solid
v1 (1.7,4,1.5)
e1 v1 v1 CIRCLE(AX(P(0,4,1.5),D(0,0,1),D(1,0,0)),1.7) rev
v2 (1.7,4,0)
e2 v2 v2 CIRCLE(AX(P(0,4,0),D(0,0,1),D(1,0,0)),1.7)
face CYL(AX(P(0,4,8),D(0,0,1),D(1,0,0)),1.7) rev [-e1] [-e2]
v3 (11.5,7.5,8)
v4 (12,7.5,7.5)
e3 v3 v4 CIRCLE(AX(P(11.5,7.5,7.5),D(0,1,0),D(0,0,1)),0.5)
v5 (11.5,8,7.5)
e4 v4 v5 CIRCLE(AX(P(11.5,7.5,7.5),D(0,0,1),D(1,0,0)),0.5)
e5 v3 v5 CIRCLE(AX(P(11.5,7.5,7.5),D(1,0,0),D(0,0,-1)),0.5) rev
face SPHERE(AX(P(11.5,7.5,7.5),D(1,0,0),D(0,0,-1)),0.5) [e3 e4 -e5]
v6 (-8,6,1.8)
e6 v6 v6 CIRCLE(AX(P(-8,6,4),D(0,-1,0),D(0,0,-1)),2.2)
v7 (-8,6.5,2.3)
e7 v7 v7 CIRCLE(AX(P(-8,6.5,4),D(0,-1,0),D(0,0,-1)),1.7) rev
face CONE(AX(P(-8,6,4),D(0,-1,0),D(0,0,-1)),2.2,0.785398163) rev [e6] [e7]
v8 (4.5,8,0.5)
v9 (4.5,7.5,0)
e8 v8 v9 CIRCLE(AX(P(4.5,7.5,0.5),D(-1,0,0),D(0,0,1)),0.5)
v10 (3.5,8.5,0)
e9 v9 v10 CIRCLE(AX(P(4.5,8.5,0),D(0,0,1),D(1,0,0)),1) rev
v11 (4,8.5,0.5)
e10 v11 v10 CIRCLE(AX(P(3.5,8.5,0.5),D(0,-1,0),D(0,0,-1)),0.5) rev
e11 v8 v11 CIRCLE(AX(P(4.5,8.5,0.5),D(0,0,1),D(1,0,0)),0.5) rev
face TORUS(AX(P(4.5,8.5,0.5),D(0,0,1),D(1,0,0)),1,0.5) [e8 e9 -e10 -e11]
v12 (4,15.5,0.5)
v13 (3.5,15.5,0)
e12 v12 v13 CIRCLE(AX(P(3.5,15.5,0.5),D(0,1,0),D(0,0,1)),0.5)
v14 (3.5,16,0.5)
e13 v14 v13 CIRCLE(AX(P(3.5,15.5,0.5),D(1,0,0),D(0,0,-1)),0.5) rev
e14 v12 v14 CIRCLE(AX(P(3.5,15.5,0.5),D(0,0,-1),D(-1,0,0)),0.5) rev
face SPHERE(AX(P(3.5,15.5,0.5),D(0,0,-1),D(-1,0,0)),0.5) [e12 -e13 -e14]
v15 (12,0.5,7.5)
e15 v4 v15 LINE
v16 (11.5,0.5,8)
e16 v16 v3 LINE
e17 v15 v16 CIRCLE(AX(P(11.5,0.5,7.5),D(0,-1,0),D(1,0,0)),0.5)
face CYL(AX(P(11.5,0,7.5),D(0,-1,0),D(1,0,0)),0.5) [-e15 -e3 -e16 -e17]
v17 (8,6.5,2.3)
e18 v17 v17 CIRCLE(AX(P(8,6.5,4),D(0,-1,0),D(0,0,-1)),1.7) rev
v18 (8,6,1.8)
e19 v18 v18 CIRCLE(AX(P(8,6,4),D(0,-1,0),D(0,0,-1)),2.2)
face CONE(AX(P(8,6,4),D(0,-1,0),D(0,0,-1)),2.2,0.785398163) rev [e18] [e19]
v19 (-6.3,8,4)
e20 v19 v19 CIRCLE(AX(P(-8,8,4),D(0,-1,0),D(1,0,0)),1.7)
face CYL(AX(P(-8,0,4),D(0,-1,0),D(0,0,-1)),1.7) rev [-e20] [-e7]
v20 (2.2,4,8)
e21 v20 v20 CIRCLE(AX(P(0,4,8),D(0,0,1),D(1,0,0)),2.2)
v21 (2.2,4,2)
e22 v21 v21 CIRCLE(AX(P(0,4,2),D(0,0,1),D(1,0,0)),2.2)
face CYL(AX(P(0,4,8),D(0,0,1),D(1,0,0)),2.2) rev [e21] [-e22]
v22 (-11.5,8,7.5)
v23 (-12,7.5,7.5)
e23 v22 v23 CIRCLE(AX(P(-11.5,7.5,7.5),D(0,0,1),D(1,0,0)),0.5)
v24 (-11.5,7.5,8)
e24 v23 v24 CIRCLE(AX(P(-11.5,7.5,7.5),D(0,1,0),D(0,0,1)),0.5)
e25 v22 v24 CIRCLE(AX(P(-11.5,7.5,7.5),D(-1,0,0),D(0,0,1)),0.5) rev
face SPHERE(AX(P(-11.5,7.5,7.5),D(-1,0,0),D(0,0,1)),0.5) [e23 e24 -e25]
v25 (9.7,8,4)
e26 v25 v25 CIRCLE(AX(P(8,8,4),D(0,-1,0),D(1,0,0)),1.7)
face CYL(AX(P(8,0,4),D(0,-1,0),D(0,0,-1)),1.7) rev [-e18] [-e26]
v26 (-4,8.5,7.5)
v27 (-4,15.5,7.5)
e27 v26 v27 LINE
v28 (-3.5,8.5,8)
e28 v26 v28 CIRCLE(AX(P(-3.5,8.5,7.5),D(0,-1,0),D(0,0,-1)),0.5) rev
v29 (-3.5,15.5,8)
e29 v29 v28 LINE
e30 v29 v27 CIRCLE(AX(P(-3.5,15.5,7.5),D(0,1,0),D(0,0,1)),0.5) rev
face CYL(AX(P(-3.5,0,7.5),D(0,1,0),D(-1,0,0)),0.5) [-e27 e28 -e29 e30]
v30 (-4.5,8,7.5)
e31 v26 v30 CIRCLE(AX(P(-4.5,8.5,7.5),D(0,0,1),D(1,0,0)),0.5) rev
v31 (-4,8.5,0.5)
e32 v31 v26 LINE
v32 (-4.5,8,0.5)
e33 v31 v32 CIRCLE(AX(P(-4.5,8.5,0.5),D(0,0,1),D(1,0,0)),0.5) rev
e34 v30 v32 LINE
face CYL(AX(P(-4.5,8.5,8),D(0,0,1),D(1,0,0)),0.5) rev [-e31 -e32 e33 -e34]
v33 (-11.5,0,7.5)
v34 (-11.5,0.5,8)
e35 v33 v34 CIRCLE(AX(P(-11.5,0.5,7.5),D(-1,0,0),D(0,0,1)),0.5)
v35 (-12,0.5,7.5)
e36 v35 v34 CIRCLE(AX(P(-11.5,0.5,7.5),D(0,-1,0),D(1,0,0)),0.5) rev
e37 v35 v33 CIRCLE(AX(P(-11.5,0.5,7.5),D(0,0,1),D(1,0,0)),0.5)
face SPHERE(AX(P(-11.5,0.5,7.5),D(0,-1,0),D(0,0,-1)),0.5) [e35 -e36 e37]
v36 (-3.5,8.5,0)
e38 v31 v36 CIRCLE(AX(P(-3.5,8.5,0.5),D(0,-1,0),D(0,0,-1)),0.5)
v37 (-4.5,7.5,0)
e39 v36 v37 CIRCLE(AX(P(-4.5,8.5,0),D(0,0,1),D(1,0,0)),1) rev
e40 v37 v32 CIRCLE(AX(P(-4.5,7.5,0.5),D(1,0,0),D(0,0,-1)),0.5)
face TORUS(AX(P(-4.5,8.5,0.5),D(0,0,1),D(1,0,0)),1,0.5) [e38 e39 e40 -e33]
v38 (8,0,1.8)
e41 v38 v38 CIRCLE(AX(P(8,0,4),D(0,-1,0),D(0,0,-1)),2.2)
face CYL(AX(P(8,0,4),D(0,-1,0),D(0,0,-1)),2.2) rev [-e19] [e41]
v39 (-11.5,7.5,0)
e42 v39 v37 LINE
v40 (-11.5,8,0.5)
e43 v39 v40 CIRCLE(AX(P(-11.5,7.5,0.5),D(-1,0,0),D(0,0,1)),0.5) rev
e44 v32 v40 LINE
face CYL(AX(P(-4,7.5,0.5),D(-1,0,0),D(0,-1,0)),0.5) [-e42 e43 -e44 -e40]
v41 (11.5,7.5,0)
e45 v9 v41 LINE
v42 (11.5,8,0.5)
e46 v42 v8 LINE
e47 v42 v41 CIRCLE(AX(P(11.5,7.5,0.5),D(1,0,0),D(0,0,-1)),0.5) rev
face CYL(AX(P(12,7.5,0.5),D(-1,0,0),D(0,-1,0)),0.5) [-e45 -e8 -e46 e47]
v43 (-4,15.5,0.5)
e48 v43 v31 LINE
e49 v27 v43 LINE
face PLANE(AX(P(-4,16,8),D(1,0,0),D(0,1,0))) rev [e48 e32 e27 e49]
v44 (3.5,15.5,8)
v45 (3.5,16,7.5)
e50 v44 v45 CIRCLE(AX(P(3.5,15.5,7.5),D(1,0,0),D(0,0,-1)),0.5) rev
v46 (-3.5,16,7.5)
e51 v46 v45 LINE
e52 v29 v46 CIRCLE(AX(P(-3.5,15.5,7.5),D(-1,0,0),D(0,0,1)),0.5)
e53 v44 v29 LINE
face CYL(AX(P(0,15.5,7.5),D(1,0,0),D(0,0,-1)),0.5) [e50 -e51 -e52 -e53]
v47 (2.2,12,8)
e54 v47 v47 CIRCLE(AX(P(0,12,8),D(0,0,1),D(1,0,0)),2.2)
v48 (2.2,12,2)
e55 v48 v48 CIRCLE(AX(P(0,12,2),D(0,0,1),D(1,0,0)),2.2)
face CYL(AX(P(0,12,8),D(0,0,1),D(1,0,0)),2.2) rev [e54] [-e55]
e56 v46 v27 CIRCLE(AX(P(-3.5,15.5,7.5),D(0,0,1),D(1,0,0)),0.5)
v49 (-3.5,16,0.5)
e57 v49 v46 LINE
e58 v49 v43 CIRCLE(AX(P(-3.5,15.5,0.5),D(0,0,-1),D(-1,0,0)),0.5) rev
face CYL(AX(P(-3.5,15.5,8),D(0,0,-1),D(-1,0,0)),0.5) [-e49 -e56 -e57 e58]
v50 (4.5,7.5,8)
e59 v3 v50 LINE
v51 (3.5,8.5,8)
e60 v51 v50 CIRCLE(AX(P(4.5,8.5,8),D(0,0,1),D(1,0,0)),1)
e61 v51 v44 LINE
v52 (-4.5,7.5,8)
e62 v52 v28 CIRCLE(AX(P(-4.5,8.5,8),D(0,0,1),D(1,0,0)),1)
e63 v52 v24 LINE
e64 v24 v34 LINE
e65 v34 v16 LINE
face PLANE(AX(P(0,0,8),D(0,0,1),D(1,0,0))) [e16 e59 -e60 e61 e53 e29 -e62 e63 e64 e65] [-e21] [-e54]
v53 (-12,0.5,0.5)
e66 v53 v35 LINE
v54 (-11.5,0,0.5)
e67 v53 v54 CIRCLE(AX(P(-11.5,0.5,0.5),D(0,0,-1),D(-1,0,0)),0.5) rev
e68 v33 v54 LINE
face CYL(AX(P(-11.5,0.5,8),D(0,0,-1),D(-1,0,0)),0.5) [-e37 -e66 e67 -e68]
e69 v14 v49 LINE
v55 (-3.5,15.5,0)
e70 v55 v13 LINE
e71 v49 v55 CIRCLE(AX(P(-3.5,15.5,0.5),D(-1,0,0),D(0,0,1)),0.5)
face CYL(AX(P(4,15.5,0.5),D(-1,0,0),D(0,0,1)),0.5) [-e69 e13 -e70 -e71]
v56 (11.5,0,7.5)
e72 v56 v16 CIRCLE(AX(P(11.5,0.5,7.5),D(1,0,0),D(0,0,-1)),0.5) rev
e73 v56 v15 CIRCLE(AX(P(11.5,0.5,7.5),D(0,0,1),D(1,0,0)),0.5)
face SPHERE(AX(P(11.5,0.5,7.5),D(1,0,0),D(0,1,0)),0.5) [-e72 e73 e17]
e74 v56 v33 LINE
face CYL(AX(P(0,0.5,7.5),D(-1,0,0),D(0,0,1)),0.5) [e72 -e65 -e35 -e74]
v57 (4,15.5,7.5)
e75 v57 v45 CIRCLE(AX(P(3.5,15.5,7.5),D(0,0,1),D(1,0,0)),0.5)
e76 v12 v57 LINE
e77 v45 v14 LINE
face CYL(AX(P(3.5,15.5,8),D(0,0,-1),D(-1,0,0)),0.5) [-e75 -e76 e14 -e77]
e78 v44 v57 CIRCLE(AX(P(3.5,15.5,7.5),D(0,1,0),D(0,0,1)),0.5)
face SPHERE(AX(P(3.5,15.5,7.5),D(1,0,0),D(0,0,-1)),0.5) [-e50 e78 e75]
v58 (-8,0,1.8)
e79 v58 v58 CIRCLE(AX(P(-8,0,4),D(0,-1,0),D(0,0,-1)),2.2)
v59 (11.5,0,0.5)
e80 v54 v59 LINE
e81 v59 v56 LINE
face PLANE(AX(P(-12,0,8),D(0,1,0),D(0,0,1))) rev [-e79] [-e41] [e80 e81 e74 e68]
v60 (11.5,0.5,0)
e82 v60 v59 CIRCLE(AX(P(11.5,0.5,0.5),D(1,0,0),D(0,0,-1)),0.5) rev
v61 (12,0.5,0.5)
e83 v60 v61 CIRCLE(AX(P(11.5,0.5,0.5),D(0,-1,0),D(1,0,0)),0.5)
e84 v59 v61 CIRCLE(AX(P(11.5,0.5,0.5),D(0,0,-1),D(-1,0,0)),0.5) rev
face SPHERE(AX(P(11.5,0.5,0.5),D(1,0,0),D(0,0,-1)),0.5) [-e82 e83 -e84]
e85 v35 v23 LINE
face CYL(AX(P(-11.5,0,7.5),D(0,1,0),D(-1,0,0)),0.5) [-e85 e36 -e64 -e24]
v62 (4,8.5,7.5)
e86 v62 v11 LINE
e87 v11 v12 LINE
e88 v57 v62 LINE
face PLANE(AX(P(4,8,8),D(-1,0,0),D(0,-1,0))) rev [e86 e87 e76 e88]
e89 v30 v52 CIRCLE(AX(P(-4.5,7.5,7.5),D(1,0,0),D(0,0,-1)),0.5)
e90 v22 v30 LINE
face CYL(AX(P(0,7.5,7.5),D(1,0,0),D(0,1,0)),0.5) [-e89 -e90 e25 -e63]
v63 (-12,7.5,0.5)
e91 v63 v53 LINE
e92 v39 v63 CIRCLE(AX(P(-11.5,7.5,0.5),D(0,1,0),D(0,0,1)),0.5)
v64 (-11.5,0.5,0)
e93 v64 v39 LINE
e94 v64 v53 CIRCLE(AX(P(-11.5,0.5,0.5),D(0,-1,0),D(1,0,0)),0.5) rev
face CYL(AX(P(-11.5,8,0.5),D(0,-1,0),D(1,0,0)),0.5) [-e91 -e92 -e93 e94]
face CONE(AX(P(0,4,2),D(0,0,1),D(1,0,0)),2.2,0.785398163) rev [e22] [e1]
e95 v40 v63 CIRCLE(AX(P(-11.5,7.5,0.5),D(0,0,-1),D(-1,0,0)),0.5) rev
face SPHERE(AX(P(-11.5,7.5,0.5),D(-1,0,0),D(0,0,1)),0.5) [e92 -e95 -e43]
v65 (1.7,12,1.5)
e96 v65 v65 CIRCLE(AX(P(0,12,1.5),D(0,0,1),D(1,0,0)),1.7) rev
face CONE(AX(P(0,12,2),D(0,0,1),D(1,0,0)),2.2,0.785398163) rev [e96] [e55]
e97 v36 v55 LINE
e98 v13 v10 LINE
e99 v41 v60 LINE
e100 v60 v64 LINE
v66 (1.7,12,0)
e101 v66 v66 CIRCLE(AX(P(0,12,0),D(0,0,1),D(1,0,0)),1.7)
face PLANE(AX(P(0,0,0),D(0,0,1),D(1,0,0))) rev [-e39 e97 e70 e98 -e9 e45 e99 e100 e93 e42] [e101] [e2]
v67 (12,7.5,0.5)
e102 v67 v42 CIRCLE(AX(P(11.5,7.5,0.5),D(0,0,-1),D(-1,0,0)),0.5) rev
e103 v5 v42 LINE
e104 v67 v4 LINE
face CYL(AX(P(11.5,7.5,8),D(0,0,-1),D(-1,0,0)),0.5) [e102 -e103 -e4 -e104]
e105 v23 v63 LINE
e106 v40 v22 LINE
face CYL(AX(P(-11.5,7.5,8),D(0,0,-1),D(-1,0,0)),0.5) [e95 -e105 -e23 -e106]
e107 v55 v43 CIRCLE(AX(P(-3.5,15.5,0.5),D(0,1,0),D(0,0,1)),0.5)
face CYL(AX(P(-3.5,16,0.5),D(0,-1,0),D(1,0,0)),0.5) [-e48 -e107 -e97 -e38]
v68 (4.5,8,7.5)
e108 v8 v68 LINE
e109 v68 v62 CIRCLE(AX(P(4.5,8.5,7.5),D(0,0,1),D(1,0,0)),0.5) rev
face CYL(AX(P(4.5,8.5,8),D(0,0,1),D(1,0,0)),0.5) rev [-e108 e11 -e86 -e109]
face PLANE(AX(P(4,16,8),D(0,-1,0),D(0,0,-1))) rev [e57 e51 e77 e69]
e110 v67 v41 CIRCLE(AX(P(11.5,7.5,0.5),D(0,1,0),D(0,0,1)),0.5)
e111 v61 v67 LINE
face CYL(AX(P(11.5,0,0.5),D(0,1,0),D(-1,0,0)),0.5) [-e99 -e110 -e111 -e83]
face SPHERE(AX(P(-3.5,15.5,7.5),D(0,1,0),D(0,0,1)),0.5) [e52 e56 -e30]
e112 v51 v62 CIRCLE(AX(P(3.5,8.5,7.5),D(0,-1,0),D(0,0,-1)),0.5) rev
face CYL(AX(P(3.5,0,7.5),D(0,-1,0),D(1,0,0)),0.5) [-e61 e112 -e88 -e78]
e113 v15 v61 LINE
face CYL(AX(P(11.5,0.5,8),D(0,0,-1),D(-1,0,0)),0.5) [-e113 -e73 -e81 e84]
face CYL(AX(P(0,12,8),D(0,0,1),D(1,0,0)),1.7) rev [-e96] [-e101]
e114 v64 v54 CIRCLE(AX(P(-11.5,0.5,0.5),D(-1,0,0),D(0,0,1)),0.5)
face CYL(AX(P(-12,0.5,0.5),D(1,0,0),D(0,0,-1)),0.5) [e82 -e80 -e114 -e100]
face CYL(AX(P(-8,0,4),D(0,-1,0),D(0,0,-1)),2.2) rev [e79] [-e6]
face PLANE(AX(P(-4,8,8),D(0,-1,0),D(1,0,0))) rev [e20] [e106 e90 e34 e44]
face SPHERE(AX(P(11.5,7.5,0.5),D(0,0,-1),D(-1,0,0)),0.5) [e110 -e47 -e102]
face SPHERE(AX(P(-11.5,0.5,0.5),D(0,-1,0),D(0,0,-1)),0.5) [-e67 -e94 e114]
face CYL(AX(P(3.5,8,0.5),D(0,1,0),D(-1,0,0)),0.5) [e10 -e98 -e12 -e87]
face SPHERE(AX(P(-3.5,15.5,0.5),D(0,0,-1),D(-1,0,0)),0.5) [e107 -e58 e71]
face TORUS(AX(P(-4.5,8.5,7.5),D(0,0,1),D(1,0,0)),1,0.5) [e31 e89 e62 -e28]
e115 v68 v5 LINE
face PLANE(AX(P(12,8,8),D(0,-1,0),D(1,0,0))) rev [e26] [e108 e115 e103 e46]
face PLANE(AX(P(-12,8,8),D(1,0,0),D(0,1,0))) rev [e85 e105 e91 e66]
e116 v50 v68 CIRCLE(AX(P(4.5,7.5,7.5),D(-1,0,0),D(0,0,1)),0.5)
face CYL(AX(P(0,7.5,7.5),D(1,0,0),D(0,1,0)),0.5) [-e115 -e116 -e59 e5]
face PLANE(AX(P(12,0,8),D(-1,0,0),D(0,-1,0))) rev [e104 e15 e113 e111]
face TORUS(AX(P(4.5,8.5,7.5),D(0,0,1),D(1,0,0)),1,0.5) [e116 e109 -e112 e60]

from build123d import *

# Parameters (mm, degrees)
BOSS_EXTRUDE1_DEPTH                      = 8
F_4_4_4_4_DIAMETER_HOLE1_D               = 4.4
F_4_4_4_4_DIAMETER_HOLE1_DEPTH           = 6
F_4_4_4_4_DIAMETER_HOLE1_TIP             = 2.2
F_4_4_4_4_DIAMETER_HOLE1_ON_FACE_2_D     = 4.4
F_4_4_4_4_DIAMETER_HOLE1_ON_FACE_2_DEPTH = 6
F_4_4_4_4_DIAMETER_HOLE1_ON_FACE_2_TIP   = 2.2
F_3_4_START                              = 6.4999999
F_3_4_3_4_DIAMETER_HOLE1_OUTLINE_R       = 1.7
F_3_4_3_4_DIAMETER_HOLE1_DEPTH           = 1.5000001
F_3_4_3_4_DIAMETER_HOLE1_2_OUTLINE_R     = 1.7
F_3_4_3_4_DIAMETER_HOLE1_2_DEPTH         = 1.5000001
FILLET1_R                                = 0.5


# Read off the part's stored shape, not the designer's step: Ø3.4 (3.4) Diameter Hole1
with BuildPart() as part:
    # Sketch1 → Boss-Extrude1 (new body)
    with BuildSketch(Plane.XY):
        Polygon((-12, 0), (12, 0), (12, 8), (4, 8), (4, 16), (-4, 16), (-4, 8), (-12, 8), align=None)
    extrude(amount=BOSS_EXTRUDE1_DEPTH)

    # Ø4.4 (4.4) Diameter Hole1
    with Locations(Plane(origin=(0, 4, 8), x_dir=(1, 0, 0), z_dir=(0, 0, 1))):
        with Locations((0, 0), (0, 8)):
            Hole(F_4_4_4_4_DIAMETER_HOLE1_D / 2, depth=F_4_4_4_4_DIAMETER_HOLE1_DEPTH)
            with Locations((0, 0, -(F_4_4_4_4_DIAMETER_HOLE1_DEPTH + F_4_4_4_4_DIAMETER_HOLE1_TIP / 2))):  # 90° drill point
                Cone(0, F_4_4_4_4_DIAMETER_HOLE1_D / 2, F_4_4_4_4_DIAMETER_HOLE1_TIP, mode=Mode.SUBTRACT)

    # Ø4.4 (4.4) Diameter Hole1 on face 2
    with Locations(Plane(origin=(8, 0, 4), x_dir=(0, 0, -1), z_dir=(0, -1, 0))):
        with Locations((0, 0), (0, -16)):
            Hole(F_4_4_4_4_DIAMETER_HOLE1_ON_FACE_2_D / 2, depth=F_4_4_4_4_DIAMETER_HOLE1_ON_FACE_2_DEPTH)
            with Locations((0, 0, -(F_4_4_4_4_DIAMETER_HOLE1_ON_FACE_2_DEPTH + F_4_4_4_4_DIAMETER_HOLE1_ON_FACE_2_TIP / 2))):  # 90° drill point
                Cone(0, F_4_4_4_4_DIAMETER_HOLE1_ON_FACE_2_D / 2, F_4_4_4_4_DIAMETER_HOLE1_ON_FACE_2_TIP, mode=Mode.SUBTRACT)

    # Ø3.4 (3.4) Diameter Hole1 outline → Ø3.4 (3.4) Diameter Hole1 (cut)
    with BuildSketch(Plane(origin=(0, 0, 0), x_dir=(1, 0, 0), z_dir=(0, 1, 0)).offset(F_3_4_START)):
        with Locations((-8, -4)):
            Circle(F_3_4_3_4_DIAMETER_HOLE1_OUTLINE_R)
        with Locations((8, -4)):
            Circle(F_3_4_3_4_DIAMETER_HOLE1_OUTLINE_R)
    extrude(amount=F_3_4_3_4_DIAMETER_HOLE1_DEPTH, mode=Mode.SUBTRACT)

    # 3.4 _3.4_ Diameter Hole1 2 outline → 3.4 _3.4_ Diameter Hole1 2 (cut)
    with BuildSketch(Plane.XY):
        with Locations((0, 4)):
            Circle(F_3_4_3_4_DIAMETER_HOLE1_2_OUTLINE_R)
        with Locations((0, 12)):
            Circle(F_3_4_3_4_DIAMETER_HOLE1_2_OUTLINE_R)
    extrude(amount=F_3_4_3_4_DIAMETER_HOLE1_2_DEPTH, mode=Mode.SUBTRACT)

    # Fillet1
    fillet1_edges = [part.edges().sort_by_distance(p)[0] for p in [
        (8, 8, 0),
        (12, 4, 0),
        (0, 0, 0),
        (-12, 4, 0),
        (12, 4, 8),
        (-12, 8, 4),
        (-4, 8, 4),
        (-4, 16, 4),
        (4, 16, 4),
        (4, 8, 4),
        (12, 8, 4),
        (12, 0, 4),
        (-12, 0, 4),
        (8, 8, 8),
        (4, 12, 8),
        (0, 16, 8),
        (-4, 12, 8),
        (-8, 8, 8),
        (-12, 4, 8),
        (-8, 8, 0),
        (0, 0, 8),
        (-4, 12, 0),
        (0, 16, 0),
        (4, 12, 0),
    ]]
    fillet(fillet1_edges, radius=FILLET1_R)


solid = part.part
